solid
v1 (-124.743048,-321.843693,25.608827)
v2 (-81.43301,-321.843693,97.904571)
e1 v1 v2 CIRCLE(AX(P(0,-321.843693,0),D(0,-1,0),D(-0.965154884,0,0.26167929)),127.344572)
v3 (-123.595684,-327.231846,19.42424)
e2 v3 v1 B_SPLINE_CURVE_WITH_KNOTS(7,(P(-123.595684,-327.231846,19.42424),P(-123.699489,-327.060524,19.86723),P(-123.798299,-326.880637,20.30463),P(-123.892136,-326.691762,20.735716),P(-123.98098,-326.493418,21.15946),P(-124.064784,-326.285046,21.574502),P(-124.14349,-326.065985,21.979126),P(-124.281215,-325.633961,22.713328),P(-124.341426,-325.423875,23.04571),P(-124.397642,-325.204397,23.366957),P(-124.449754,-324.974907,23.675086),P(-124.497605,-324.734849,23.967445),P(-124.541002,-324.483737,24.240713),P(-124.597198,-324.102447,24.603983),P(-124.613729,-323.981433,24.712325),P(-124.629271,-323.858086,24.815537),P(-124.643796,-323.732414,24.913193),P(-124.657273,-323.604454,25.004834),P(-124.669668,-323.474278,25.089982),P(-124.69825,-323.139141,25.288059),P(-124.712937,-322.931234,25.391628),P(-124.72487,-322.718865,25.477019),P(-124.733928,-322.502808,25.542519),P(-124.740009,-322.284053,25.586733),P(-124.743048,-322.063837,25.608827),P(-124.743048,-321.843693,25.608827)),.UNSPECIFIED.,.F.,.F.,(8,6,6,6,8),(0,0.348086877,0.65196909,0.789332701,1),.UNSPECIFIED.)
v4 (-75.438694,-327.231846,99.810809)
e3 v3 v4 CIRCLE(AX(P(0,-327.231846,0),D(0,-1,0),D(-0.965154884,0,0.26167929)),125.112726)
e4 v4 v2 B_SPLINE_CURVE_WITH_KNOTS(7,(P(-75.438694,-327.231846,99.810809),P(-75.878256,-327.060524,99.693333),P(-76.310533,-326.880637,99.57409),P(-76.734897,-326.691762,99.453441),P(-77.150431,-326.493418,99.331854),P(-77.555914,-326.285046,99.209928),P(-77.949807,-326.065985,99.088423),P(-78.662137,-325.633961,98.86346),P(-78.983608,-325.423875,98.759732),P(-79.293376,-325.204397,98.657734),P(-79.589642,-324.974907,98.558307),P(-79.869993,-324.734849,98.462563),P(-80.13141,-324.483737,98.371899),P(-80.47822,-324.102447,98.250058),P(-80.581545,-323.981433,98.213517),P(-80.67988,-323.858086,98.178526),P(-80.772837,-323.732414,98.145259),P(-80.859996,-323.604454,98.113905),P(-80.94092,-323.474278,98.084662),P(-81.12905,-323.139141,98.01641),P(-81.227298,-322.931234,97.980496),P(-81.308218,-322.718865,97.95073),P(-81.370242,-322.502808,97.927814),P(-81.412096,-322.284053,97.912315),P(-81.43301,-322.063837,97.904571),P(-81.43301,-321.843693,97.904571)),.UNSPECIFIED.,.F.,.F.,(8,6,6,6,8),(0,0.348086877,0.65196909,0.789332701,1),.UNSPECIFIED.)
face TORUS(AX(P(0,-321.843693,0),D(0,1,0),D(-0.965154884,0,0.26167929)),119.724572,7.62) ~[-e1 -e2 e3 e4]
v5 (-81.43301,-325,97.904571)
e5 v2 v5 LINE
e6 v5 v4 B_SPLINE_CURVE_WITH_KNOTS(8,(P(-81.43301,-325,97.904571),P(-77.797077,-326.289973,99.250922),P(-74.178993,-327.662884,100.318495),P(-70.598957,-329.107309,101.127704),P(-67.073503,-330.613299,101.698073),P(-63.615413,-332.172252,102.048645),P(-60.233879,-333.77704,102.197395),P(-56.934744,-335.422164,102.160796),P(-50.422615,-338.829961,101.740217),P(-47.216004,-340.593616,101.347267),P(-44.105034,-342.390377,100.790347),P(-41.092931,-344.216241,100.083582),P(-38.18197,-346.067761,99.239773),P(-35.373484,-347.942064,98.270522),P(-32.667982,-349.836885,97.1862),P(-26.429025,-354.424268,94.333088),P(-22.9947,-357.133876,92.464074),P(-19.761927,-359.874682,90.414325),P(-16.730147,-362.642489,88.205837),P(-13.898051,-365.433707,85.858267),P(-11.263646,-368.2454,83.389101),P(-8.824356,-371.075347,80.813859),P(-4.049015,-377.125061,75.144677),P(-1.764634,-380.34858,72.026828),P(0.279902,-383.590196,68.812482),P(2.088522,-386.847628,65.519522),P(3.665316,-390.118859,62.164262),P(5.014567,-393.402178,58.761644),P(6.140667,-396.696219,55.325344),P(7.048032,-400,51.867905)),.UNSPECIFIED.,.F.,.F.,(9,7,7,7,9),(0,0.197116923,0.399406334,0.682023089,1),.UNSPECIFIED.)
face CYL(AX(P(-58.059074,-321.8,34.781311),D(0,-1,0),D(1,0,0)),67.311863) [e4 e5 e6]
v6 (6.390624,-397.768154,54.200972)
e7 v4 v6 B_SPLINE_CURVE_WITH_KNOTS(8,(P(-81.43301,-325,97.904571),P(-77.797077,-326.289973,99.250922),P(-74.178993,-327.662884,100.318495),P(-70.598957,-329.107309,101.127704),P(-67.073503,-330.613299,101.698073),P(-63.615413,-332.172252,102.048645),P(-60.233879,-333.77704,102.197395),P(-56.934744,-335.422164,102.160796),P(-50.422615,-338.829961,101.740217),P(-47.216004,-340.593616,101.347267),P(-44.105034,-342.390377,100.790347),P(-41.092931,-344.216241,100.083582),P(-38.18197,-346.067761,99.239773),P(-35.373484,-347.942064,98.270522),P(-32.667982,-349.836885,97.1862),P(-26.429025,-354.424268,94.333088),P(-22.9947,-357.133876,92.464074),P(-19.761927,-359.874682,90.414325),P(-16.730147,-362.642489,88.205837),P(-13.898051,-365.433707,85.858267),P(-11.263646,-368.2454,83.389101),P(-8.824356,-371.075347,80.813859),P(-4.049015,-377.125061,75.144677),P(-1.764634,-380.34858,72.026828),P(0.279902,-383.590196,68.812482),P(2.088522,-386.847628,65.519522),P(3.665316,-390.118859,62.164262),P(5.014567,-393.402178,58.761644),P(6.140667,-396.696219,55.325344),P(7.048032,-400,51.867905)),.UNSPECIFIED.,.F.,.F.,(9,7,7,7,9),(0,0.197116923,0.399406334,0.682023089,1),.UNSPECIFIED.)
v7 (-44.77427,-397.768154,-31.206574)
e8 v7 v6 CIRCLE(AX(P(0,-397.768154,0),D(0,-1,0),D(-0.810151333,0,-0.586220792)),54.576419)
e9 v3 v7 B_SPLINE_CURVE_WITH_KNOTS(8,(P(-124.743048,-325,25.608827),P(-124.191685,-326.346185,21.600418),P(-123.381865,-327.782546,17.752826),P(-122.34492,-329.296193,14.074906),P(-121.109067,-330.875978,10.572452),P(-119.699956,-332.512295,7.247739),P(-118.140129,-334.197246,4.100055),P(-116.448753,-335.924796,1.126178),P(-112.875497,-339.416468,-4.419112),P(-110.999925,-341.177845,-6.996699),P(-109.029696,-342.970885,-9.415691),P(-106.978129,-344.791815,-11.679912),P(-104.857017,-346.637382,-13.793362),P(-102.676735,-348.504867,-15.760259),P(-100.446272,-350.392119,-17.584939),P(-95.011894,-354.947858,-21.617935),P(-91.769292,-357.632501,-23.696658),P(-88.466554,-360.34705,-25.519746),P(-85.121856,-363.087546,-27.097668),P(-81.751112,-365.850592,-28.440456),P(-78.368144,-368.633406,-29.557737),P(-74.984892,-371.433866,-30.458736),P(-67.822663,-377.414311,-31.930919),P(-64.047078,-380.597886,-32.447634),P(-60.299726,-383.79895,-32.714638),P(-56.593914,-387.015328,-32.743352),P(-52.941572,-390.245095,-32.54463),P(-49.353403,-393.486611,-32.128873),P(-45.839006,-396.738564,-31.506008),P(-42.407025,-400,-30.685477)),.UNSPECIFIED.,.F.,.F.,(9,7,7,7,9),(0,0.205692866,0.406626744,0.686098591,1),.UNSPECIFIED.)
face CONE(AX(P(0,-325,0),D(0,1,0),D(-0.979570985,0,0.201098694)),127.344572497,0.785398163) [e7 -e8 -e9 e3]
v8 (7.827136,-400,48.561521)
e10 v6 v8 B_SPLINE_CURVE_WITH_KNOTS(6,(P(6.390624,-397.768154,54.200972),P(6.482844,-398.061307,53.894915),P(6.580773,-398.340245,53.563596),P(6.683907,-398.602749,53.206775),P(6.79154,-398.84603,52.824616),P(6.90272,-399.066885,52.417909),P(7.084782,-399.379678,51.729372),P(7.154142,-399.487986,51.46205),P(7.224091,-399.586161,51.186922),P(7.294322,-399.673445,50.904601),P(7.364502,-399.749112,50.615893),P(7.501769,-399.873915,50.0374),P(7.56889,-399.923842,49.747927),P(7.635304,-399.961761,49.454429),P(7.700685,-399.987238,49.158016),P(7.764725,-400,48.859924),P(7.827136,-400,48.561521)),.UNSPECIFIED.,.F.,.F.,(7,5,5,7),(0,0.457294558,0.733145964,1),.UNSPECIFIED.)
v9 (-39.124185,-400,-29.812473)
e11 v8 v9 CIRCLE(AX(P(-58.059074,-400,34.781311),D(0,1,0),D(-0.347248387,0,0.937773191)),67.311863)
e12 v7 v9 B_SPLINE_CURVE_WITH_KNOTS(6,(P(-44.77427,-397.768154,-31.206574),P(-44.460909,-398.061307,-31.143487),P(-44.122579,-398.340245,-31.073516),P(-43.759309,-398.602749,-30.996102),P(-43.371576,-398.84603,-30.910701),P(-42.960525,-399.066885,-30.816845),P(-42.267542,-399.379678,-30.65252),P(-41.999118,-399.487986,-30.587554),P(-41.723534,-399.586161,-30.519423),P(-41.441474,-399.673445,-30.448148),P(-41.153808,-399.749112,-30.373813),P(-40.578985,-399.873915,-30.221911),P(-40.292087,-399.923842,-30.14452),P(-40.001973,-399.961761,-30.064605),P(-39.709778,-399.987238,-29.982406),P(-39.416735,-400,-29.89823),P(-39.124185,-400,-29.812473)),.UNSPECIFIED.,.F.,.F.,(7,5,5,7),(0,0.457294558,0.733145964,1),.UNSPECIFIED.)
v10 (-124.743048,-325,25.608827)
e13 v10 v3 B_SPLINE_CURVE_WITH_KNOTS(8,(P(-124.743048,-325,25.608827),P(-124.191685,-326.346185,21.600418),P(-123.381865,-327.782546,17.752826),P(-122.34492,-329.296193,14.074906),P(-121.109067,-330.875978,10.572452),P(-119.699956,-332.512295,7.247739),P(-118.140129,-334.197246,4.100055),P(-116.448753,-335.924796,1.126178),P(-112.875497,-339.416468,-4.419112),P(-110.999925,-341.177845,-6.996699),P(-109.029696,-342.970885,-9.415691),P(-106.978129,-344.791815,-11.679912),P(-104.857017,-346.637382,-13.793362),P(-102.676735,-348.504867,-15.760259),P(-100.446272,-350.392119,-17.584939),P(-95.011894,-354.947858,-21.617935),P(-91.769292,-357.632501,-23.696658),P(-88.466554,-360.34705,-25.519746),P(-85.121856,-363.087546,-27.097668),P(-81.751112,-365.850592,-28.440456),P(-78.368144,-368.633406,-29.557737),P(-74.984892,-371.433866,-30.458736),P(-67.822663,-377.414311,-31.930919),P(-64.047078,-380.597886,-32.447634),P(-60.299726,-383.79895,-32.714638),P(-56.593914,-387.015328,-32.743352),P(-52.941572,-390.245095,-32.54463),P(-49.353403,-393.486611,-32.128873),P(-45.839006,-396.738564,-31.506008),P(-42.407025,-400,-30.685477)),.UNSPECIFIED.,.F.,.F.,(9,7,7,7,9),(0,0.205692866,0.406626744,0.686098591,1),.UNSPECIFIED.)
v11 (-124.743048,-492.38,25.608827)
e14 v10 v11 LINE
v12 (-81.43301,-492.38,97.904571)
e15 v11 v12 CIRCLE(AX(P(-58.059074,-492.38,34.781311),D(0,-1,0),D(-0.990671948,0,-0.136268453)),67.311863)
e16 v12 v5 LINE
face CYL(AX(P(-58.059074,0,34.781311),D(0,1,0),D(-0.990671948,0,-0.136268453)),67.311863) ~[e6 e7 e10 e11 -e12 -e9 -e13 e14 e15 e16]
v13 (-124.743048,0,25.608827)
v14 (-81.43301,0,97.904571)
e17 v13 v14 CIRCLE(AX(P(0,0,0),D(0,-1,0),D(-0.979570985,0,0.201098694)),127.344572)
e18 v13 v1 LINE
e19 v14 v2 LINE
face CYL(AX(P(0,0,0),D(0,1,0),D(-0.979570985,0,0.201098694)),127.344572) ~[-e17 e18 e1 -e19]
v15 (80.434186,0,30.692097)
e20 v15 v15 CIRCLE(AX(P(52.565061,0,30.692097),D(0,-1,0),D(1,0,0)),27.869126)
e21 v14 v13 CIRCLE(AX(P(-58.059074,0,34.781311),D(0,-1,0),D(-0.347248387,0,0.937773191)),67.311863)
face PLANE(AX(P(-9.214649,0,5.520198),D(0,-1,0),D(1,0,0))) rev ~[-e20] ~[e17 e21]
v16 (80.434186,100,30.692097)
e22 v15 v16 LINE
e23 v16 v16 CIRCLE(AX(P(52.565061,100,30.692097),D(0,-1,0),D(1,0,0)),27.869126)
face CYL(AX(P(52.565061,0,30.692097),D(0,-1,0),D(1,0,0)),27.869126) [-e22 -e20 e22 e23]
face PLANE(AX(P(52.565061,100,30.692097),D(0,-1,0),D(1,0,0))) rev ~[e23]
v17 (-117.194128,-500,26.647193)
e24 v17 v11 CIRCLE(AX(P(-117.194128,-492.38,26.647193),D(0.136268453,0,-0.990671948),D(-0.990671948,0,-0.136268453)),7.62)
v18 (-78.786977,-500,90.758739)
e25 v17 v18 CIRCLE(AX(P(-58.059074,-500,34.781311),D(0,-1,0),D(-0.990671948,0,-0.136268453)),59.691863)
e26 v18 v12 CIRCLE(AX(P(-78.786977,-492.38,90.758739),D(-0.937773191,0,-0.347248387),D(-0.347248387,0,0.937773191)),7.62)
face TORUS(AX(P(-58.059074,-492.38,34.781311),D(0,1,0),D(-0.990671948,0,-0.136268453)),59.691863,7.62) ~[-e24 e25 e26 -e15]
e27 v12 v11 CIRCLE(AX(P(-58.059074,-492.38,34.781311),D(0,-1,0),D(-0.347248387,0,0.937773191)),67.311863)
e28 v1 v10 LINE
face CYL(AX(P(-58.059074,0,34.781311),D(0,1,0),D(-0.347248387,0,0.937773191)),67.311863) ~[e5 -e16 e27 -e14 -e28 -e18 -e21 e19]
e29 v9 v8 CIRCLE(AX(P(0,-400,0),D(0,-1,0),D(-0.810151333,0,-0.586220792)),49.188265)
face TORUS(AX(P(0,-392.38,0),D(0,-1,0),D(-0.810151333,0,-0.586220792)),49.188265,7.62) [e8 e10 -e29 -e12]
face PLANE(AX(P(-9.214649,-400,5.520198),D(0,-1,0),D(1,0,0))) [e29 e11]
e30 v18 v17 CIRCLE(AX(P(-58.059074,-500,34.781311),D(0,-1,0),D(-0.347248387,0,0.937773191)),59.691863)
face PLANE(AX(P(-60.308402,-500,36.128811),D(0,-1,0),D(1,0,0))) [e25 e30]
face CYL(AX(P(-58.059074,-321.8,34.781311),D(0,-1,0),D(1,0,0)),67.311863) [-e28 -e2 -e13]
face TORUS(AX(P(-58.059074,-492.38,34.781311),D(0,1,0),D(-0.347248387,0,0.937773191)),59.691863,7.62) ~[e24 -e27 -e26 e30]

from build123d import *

# Parameters (mm, degrees)
F1_DEPTH    = 500
F0_R        = 27.8691255666
F2_DEPTH    = 400
F3_DEPTH    = 100
F4_SIZE     = 75
F5_R        = 7.62
F6_R        = 7.62
F7_T4_ANGLE = 328.4905382485
F7_S5_R     = 67.3118629199
F7_T6_DEPTH = 190


# Not quite as in the source:
# - a fillet or chamfer that OpenCascade refuses, or shapes differently, is made with other operations: its cross-section is extruded or revolved along the edge and cut away or added


with BuildPart() as f1:
    # F0 (on Front) → F1 (new body)
    with BuildSketch(Plane.XZ):
        with BuildLine():
            ThreePointArc((9.2527889353, 34.7813107073), (-19.6042711183, 90.0272610229), (-81.4330097892, 97.9045711963))
            ThreePointArc((-81.4330097892, 97.9045711963), (-109.241980875, 65.4433324256), (-124.7430483487, 25.6088272504))
            ThreePointArc((-124.7430483487, 25.6088272504), (-53.4620995229, -32.373396615), (9.2527889353, 34.7813107073))
        make_face()
        with BuildLine():
            ThreePointArc((-124.7430483487, 25.6088272504), (-109.241980875, 65.4433324256), (-81.4330097892, 97.9045711963))
            ThreePointArc((-81.4330097892, 97.9045711963), (-115.8022592462, 69.3733827123), (-124.7430483487, 25.6088272504))
        make_face()
    extrude(amount=F1_DEPTH)

    # F0 (on Front) → F2 (join)
    with BuildSketch(Plane.XZ):
        with BuildLine():
            ThreePointArc((-124.7430483487, 25.6088272504), (-12.870314303, -126.6925220927), (127.3445724971, 0))
            ThreePointArc((127.3445724971, 0), (54.0674963619, 115.2967735091), (-81.4330097892, 97.9045711963))
            ThreePointArc((-81.4330097892, 97.9045711963), (-19.6042711183, 90.0272610229), (9.2527889353, 34.7813107073))
            ThreePointArc((9.2527889353, 34.7813107073), (-53.4620995229, -32.373396615), (-124.7430483487, 25.6088272504))
        make_face()
        with Locations((52.5650605559, 30.6920967996)):
            Circle(F0_R, mode=Mode.SUBTRACT)
        with Locations((52.5650605559, 30.6920967996)):
            Circle(F0_R)
    extrude(amount=F2_DEPTH)

    # F0 (on Front) → F3 (join)
    with BuildSketch(Plane.XZ):
        with Locations((52.5650605559, 30.6920967996)):
            Circle(F0_R)
    extrude(amount=-F3_DEPTH)

    # F4
    f4_edges = [f1.edges().sort_by_distance(p)[0] for p in [
        (109.241981, -400, -65.443332),
    ]]
    chamfer(f4_edges, length=F4_SIZE)

    # F5
    f5_edges = [f1.edges().sort_by_distance(p)[0] for p in [
        (-125.370937, -500, 34.781311),
    ]]
    fillet(f5_edges, radius=F5_R)

    # F6
    f6_edges = [f1.edges().sort_by_distance(p)[0] for p in [
        (44.903561, -400, -26.900269),
    ]]
    fillet(f6_edges, radius=F6_R)

    # F7: fillet of radius 7.62 on 1 edges, made by hand


with BuildPart() as f7_tool2:
    # F7_s3 → F7_t4 (revolve)
    with BuildSketch(Plane(origin=(0, 0, 0), x_dir=(0, 1, 0), z_dir=(0.2616792898, 0, 0.9651548836))):
        with BuildLine():
            ThreePointArc((-327.2318463274, 125.1127261697), (-324.7597404093, 126.7645345348), (-321.8436926547, 127.3445724971))
            Line((-321.8436926547, 127.3445724971), (-325, 127.3445724971))
            Line((-325, 127.3445724971), (-327.2318463274, 125.1127261697))
        make_face()
    revolve(axis=Axis((0, -325, 0), (0, -1, 0)), revolution_arc=F7_T4_ANGLE)

    # F7_s5 → F7_t6 (cut, symmetric)
    with BuildSketch(Plane.XZ.offset(321.8)):
        with Locations((-58.0590739846, 34.7813107073)):
            Circle(F7_S5_R)
    extrude(amount=F7_T6_DEPTH, both=True, mode=Mode.SUBTRACT)


with BuildPart() as f1_1:
    add(f1.part)

    # F7_t1: cut F7_tool2
    add(f7_tool2.part, mode=Mode.SUBTRACT)


solid = f1_1.part
